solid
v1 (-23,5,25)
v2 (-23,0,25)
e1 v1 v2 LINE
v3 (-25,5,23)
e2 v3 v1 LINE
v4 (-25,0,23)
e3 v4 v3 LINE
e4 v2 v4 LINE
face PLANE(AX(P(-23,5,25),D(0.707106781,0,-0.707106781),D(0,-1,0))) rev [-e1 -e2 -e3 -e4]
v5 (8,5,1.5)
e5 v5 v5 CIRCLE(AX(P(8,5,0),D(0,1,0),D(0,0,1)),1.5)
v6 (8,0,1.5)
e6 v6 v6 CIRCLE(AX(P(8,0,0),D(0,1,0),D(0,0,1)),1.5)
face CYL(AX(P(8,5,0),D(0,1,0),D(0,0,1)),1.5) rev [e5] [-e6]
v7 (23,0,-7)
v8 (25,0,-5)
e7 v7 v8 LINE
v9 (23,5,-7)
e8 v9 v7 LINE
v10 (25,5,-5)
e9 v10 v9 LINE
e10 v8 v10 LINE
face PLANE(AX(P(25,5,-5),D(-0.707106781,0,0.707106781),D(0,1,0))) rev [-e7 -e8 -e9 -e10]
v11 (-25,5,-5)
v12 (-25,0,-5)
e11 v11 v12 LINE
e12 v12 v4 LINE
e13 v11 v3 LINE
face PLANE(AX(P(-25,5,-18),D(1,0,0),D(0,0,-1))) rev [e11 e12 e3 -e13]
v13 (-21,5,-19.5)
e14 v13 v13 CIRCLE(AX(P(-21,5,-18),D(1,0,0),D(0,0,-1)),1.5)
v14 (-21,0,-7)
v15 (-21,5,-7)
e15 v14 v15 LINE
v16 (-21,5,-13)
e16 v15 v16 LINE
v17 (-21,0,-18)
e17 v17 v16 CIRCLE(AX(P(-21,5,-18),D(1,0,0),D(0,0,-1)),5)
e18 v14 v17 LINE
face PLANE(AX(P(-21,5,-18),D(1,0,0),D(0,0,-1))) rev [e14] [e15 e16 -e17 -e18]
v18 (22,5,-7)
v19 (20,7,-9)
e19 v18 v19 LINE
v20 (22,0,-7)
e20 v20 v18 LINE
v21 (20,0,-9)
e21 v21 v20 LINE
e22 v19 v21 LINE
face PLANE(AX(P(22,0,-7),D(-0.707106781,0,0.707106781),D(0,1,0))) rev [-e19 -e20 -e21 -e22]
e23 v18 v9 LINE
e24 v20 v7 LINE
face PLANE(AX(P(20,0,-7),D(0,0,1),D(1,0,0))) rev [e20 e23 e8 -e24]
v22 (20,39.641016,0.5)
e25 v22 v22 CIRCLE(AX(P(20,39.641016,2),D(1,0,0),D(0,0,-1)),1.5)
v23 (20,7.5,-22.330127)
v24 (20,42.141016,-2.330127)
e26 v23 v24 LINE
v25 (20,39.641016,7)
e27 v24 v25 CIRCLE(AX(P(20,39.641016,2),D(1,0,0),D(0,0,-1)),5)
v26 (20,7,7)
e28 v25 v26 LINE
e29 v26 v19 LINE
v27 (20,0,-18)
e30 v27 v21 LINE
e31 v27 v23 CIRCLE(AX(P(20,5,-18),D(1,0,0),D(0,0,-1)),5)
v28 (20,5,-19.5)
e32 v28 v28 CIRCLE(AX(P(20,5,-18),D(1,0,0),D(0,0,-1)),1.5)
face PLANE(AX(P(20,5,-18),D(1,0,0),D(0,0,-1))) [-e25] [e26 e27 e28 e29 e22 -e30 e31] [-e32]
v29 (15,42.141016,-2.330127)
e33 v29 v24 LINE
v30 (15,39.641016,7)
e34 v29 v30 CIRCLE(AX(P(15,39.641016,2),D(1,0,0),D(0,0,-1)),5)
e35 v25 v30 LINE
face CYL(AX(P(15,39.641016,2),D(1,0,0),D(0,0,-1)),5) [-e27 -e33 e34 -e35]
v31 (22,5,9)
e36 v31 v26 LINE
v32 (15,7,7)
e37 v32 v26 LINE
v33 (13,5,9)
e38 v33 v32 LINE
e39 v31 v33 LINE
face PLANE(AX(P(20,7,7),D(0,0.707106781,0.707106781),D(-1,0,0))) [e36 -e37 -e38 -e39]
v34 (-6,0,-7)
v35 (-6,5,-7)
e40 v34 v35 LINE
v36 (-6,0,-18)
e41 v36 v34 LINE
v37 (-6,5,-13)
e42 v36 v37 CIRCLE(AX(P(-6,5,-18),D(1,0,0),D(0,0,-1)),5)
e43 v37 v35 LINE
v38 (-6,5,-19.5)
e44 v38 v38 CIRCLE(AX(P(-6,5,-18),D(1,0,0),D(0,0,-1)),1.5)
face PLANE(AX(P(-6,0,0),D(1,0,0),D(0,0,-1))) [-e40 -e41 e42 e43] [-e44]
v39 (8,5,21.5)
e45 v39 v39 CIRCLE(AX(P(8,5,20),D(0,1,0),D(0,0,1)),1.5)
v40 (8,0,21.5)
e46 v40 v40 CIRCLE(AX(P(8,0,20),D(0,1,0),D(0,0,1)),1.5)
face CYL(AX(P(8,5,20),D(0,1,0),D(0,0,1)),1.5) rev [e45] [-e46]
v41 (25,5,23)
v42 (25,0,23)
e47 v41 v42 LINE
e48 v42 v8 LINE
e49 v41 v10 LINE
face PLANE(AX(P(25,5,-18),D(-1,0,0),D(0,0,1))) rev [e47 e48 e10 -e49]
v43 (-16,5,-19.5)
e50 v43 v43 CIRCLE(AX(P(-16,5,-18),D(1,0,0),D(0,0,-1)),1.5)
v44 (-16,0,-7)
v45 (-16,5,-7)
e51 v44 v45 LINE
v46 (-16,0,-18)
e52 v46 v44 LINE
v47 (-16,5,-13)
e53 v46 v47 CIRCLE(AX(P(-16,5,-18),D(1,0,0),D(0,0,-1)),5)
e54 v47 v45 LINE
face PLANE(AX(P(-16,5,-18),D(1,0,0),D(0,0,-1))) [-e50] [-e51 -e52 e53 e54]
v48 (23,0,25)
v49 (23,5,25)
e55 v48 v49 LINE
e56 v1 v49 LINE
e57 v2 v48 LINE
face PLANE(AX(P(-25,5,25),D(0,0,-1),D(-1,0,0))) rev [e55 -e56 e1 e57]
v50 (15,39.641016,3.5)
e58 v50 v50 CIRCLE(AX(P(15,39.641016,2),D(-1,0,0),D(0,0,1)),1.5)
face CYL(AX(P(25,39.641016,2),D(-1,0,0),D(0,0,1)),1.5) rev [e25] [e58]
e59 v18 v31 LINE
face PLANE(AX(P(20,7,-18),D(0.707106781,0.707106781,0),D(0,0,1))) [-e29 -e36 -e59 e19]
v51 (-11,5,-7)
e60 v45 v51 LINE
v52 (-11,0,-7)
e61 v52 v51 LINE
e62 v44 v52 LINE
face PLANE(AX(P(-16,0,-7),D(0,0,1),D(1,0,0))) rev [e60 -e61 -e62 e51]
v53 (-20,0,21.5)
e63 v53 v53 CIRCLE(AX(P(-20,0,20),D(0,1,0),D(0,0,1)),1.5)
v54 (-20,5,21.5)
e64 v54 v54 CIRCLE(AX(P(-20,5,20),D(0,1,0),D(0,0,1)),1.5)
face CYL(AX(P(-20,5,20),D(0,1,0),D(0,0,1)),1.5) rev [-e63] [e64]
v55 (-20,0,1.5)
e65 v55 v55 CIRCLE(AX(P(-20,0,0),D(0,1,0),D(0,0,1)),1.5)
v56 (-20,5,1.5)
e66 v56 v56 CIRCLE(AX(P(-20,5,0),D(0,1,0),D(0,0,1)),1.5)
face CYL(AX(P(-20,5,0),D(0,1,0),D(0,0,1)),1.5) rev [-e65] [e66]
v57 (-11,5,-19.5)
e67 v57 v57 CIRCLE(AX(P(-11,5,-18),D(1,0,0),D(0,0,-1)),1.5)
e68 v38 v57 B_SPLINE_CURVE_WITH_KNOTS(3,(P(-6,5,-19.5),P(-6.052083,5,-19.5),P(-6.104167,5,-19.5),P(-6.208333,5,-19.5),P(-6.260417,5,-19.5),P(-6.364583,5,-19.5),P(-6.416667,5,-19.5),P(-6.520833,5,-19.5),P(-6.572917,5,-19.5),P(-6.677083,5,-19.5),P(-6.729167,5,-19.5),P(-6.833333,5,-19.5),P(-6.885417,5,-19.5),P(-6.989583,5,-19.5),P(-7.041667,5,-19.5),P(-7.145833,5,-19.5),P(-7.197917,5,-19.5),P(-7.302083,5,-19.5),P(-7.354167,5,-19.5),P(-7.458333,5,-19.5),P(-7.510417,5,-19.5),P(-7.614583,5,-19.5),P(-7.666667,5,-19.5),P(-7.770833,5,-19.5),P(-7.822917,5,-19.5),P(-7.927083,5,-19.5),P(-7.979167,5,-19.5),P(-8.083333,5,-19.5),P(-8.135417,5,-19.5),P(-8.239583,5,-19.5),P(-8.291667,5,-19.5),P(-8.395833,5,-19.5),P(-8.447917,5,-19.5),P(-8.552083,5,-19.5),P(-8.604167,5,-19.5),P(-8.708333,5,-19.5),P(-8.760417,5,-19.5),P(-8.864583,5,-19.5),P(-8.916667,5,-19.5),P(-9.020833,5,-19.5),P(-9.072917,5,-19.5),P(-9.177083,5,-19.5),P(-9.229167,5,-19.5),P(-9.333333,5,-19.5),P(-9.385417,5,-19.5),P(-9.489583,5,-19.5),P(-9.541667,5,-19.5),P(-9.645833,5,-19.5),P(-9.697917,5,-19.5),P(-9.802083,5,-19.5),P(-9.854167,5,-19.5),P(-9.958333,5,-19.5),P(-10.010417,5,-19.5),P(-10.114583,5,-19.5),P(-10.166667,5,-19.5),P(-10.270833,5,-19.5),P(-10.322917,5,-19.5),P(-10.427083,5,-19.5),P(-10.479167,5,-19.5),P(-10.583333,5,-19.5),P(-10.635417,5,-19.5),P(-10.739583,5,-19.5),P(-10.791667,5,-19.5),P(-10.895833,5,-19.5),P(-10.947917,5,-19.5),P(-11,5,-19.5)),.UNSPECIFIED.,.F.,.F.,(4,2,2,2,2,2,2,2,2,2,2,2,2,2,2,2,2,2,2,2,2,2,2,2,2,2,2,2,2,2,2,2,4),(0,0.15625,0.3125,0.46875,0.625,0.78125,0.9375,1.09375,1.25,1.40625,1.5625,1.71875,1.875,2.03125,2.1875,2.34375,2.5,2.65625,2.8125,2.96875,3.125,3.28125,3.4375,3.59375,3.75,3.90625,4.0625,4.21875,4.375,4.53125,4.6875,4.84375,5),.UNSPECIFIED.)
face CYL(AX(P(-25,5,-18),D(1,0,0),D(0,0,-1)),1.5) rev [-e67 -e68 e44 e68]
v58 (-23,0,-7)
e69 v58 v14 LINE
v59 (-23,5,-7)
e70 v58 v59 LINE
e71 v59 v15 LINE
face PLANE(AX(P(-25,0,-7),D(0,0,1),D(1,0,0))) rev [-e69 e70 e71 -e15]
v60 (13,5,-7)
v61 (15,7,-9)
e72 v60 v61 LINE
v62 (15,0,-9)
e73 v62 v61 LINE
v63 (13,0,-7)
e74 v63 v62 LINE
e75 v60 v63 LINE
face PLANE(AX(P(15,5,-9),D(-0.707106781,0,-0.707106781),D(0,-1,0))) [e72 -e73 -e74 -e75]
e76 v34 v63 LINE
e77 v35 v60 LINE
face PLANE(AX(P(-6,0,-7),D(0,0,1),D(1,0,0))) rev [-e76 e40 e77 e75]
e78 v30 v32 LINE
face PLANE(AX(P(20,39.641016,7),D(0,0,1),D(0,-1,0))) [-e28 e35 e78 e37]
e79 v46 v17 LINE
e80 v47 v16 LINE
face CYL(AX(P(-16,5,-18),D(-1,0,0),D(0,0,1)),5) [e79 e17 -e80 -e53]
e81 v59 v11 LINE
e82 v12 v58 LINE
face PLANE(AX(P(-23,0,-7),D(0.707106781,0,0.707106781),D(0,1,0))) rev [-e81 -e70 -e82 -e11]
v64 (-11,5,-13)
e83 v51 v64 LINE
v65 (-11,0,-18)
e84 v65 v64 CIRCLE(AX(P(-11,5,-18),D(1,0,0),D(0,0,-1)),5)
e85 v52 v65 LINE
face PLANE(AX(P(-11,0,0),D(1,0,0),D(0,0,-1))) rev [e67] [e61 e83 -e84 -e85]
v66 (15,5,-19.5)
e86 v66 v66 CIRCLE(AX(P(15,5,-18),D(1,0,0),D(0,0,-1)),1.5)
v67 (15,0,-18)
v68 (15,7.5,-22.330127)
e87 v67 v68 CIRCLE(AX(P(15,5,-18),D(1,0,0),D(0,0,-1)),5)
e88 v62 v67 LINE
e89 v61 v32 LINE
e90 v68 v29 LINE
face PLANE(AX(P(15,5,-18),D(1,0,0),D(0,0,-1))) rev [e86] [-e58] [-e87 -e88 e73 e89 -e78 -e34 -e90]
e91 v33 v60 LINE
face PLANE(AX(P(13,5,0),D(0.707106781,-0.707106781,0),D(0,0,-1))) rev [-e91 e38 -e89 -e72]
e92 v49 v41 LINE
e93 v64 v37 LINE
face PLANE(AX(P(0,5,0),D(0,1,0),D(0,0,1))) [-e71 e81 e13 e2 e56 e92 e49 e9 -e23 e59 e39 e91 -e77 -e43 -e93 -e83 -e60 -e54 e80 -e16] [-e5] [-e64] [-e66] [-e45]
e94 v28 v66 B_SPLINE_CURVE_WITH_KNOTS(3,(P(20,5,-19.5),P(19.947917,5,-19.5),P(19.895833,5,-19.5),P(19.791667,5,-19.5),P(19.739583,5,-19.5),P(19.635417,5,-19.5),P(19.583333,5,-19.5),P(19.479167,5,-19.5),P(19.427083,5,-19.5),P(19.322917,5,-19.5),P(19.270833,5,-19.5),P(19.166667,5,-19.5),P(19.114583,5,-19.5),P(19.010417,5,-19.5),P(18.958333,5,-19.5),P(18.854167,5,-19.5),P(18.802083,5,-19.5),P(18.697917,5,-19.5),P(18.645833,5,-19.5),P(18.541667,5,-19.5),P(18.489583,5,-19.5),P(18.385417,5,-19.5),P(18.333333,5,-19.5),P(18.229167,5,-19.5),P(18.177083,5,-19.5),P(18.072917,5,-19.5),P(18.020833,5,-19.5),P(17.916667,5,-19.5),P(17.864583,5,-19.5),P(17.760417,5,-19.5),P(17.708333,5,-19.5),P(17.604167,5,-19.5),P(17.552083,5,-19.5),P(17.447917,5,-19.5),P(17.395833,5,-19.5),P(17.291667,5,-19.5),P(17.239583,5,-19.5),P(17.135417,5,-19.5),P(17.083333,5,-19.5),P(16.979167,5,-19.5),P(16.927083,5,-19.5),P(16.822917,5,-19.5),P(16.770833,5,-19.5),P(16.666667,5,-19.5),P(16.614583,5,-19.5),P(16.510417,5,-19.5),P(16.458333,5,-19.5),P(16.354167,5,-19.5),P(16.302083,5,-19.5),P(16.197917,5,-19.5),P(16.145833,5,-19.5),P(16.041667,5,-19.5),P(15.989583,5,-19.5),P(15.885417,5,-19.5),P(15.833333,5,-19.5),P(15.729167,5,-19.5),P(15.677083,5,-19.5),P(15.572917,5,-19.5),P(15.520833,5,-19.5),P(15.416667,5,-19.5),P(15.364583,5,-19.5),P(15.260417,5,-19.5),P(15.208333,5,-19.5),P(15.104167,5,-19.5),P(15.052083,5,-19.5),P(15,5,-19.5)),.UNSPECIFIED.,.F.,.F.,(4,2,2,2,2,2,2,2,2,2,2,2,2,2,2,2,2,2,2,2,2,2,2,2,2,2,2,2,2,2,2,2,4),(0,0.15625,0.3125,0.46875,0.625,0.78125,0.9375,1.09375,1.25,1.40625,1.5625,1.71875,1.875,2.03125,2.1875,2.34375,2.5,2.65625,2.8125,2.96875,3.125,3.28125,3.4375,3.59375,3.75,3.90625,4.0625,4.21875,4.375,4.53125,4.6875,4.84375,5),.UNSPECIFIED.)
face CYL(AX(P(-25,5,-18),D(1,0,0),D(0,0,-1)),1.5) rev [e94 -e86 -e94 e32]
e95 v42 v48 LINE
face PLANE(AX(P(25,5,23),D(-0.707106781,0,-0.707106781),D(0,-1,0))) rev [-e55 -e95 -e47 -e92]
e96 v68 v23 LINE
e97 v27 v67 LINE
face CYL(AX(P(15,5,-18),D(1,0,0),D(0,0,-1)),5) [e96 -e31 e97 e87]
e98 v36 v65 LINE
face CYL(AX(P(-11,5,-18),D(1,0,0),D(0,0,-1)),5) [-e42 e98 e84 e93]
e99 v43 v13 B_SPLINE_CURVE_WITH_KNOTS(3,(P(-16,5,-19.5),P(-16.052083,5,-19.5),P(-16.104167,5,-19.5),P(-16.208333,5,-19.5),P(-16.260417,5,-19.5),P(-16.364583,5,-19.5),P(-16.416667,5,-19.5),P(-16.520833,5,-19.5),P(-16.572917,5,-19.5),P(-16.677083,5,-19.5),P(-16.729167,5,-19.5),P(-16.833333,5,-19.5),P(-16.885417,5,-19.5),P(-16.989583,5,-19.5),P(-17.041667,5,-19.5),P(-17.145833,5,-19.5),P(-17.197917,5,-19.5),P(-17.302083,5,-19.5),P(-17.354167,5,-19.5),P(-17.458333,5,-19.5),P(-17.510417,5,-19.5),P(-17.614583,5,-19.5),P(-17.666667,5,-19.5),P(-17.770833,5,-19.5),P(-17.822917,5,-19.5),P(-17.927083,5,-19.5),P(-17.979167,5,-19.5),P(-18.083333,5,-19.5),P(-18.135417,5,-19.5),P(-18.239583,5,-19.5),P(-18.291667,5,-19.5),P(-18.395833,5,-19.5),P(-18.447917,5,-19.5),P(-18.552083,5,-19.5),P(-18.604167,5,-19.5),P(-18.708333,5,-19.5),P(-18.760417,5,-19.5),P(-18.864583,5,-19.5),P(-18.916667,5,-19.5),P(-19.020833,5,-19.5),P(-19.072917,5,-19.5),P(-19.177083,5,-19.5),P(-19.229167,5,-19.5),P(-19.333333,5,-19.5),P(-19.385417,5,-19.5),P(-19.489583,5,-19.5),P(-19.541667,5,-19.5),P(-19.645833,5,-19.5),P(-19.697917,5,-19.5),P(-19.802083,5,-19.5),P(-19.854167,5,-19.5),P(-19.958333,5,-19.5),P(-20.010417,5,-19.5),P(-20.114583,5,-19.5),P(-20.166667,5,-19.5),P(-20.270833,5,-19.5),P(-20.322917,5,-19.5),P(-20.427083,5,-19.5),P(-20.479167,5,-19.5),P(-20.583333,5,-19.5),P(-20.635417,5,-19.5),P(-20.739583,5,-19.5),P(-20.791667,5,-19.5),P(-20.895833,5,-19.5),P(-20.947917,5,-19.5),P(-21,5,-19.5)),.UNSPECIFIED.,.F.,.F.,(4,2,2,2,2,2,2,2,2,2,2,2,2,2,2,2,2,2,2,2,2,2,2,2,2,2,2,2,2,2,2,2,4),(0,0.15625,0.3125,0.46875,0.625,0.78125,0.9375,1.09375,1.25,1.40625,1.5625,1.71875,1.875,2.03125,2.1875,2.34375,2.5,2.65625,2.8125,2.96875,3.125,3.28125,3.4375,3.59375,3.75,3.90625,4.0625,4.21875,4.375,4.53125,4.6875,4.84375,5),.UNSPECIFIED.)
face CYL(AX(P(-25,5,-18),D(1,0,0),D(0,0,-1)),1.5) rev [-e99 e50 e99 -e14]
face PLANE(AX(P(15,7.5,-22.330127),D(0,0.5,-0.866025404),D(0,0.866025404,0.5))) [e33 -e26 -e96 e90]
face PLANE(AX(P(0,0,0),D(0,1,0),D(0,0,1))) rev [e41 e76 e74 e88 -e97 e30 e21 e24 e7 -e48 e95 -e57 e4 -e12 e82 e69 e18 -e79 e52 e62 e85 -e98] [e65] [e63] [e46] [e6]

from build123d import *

# Parameters (mm, degrees)
SKETCH_1_W                 = 50
SKETCH_1_H                 = 43
EXTRUDE_1_DEPTH            = 5
EXTRUDE_2_DEPTH            = 5
EXTRUDE_START              = -6
EXTRUDE_3_DEPTH            = 5
EXTRUDE_START_2            = 5
SKETCH_6_R                 = 5
EXTRUDE_4_DEPTH            = 5
SKETCH_7_W                 = 5
SKETCH_7_H                 = 11
SKETCH_7_W_2               = 21
SKETCH_7_W_3               = 4
CUT_EXTRUDE_1_DEPTH        = 54.116947969
CUT_EXTRUDE_2_DEPTH        = 69.138244203
CUT_EXTRUDE_2_DEPTH_BACK   = 69.138244203
SKETCH_9_R                 = 1.5
CHAMFER_1_SIZE             = 2
SKETCH_10_R                = 1.5
CUT_EXTRUDE_3_DEPTH        = 65.944748233
RIB_1_REACH                = 70.138
SKETCH_11_WALL_W           = 172.917504556
SKETCH_11_WALL_H           = 5
CHAMFER_2_SIZE             = 2
HOLE_WIZARD_M3_1_OUTLINE_R = 1.5
HOLE_WIZARD_M3_1_DEPTH     = 5


# Read off the part's stored shape, not the designer's step: M3 螺纹孔1
with BuildPart() as part:
    # 草图1 → 凸台-拉伸1 (new body)
    with BuildSketch(Plane(origin=(0, 0, 0), x_dir=(1, 0, 0), z_dir=(0, 1, 0))):
        with Locations((0, -3.5)):
            Rectangle(SKETCH_1_W, SKETCH_1_H)
    extrude(amount=EXTRUDE_1_DEPTH)

    # 草图3 → 凸台-拉伸2 (add)
    with BuildSketch(Plane(origin=(20, 0, 0), x_dir=(0, 0, -1), z_dir=(1, 0, 0))):
        with BuildLine():
            Line((13.669872981, 2.5), (-6.330127019, 37.141016151))
            ThreePointArc((-6.330127019, 37.141016151), (-4.5, 43.97114317), (2.330127019, 42.141016151))
            Line((2.330127019, 42.141016151), (22.330127019, 7.5))
            ThreePointArc((22.330127019, 7.5), (20.5, 0.669872981), (13.669872981, 2.5))
        make_face()
    extrude(amount=-EXTRUDE_2_DEPTH)

    # 草图5 → 凸台-拉伸3 (add)
    with BuildSketch(Plane(origin=(0, 0, 0), x_dir=(0, 0, -1), z_dir=(1, 0, 0)).offset(EXTRUDE_START)):
        with BuildLine():
            ThreePointArc((22.330127019, 7.5), (13.669872981, 7.5), (18, 0))
            ThreePointArc((18, 0), (21.535533906, 1.464466094), (23, 5))
            ThreePointArc((23, 5), (22.829629131, 6.294095226), (22.330127019, 7.5))
        make_face()
    extrude(amount=-EXTRUDE_3_DEPTH)

    # 草图6 → 凸台-拉伸4 (add)
    with BuildSketch(Plane(origin=(-21, 0, 0), x_dir=(0, 0, -1), z_dir=(1, 0, 0)).offset(EXTRUDE_START_2)):
        with Locations((18, 5)):
            Circle(SKETCH_6_R)
    extrude(amount=-EXTRUDE_4_DEPTH)

    # 草图7 → 切除-拉伸1 (cut, through all)
    with BuildSketch(Plane(origin=(0, 5, 0), x_dir=(1, 0, 0), z_dir=(0, 1, 0))):
        with Locations((-13.5, 12.5)):
            Rectangle(SKETCH_7_W, SKETCH_7_H)
        with Locations((4.5, 12.5)):
            Rectangle(SKETCH_7_W_2, SKETCH_7_H)
        with Locations((22.5, 12.5)):
            Rectangle(SKETCH_7_W, SKETCH_7_H)
        with Locations((-23, 12.5)):
            Rectangle(SKETCH_7_W_3, SKETCH_7_H)
    extrude(amount=-CUT_EXTRUDE_1_DEPTH, mode=Mode.SUBTRACT)

    # 草图9 → 切除-拉伸2 (cut, two sides: drawn at the far end of the back side and taken through both)
    with BuildSketch(Plane(origin=(20, 0, 0), x_dir=(0, 0, -1), z_dir=(1, 0, 0)).offset(-CUT_EXTRUDE_2_DEPTH_BACK)):
        with Locations((18, 5)):
            Circle(SKETCH_9_R)
    extrude(amount=CUT_EXTRUDE_2_DEPTH + CUT_EXTRUDE_2_DEPTH_BACK, mode=Mode.SUBTRACT)

    # 倒角1
    chamfer_1_edges = [part.edges().sort_by_distance(p)[0] for p in [
        (-25, 2.5, -7),
        (25, 2.5, 25),
        (25, 2.5, -7),
        (-25, 2.5, 25),
    ]]
    chamfer(chamfer_1_edges, length=CHAMFER_1_SIZE)

    # 草图10 → 切除-拉伸3 (cut, through all)
    with BuildSketch(Plane.ZY.offset(-15)):
        with Locations((2, 39.641016151)):
            Circle(SKETCH_10_R)
    extrude(amount=-CUT_EXTRUDE_3_DEPTH, mode=Mode.SUBTRACT)

    # 草图11 wall → 筋1 (add, up to next)
    with BuildSketch(Plane(origin=(20, 22.320508076, 7), x_dir=(0, -1, 0), z_dir=(0, 0, -1)), mode=Mode.PRIVATE) as rib_1_sk1:
        with Locations((0, 2.5)):
            Rectangle(SKETCH_11_WALL_W, SKETCH_11_WALL_H)
    rib_1_tool1 = extrude(rib_1_sk1.sketch, amount=RIB_1_REACH, mode=Mode.PRIVATE) - part.part
    add(rib_1_tool1.solids().sort_by_distance((20, 22.320508076, 7))[0])

    # 倒角2
    chamfer_2_edges = [part.edges().sort_by_distance(p)[0] for p in [
        (15, 5, 0),
        (17.5, 5, 7),
        (20, 5, 0),
        (20, 2.5, -7),
        (15, 2.5, -7),
    ]]
    chamfer(chamfer_2_edges, length=CHAMFER_2_SIZE)

    # M3 螺纹孔1 outline → M3 螺纹孔1 (cut)
    with BuildSketch(Plane(origin=(0, 0, 0), x_dir=(1, 0, 0), z_dir=(0, 1, 0))):
        with Locations((8, 0)):
            Circle(HOLE_WIZARD_M3_1_OUTLINE_R)
        with Locations((-20, -20)):
            Circle(HOLE_WIZARD_M3_1_OUTLINE_R)
        with Locations((-20, 0)):
            Circle(HOLE_WIZARD_M3_1_OUTLINE_R)
        with Locations((8, -20)):
            Circle(HOLE_WIZARD_M3_1_OUTLINE_R)
    extrude(amount=HOLE_WIZARD_M3_1_DEPTH, mode=Mode.SUBTRACT)


solid = part.part
